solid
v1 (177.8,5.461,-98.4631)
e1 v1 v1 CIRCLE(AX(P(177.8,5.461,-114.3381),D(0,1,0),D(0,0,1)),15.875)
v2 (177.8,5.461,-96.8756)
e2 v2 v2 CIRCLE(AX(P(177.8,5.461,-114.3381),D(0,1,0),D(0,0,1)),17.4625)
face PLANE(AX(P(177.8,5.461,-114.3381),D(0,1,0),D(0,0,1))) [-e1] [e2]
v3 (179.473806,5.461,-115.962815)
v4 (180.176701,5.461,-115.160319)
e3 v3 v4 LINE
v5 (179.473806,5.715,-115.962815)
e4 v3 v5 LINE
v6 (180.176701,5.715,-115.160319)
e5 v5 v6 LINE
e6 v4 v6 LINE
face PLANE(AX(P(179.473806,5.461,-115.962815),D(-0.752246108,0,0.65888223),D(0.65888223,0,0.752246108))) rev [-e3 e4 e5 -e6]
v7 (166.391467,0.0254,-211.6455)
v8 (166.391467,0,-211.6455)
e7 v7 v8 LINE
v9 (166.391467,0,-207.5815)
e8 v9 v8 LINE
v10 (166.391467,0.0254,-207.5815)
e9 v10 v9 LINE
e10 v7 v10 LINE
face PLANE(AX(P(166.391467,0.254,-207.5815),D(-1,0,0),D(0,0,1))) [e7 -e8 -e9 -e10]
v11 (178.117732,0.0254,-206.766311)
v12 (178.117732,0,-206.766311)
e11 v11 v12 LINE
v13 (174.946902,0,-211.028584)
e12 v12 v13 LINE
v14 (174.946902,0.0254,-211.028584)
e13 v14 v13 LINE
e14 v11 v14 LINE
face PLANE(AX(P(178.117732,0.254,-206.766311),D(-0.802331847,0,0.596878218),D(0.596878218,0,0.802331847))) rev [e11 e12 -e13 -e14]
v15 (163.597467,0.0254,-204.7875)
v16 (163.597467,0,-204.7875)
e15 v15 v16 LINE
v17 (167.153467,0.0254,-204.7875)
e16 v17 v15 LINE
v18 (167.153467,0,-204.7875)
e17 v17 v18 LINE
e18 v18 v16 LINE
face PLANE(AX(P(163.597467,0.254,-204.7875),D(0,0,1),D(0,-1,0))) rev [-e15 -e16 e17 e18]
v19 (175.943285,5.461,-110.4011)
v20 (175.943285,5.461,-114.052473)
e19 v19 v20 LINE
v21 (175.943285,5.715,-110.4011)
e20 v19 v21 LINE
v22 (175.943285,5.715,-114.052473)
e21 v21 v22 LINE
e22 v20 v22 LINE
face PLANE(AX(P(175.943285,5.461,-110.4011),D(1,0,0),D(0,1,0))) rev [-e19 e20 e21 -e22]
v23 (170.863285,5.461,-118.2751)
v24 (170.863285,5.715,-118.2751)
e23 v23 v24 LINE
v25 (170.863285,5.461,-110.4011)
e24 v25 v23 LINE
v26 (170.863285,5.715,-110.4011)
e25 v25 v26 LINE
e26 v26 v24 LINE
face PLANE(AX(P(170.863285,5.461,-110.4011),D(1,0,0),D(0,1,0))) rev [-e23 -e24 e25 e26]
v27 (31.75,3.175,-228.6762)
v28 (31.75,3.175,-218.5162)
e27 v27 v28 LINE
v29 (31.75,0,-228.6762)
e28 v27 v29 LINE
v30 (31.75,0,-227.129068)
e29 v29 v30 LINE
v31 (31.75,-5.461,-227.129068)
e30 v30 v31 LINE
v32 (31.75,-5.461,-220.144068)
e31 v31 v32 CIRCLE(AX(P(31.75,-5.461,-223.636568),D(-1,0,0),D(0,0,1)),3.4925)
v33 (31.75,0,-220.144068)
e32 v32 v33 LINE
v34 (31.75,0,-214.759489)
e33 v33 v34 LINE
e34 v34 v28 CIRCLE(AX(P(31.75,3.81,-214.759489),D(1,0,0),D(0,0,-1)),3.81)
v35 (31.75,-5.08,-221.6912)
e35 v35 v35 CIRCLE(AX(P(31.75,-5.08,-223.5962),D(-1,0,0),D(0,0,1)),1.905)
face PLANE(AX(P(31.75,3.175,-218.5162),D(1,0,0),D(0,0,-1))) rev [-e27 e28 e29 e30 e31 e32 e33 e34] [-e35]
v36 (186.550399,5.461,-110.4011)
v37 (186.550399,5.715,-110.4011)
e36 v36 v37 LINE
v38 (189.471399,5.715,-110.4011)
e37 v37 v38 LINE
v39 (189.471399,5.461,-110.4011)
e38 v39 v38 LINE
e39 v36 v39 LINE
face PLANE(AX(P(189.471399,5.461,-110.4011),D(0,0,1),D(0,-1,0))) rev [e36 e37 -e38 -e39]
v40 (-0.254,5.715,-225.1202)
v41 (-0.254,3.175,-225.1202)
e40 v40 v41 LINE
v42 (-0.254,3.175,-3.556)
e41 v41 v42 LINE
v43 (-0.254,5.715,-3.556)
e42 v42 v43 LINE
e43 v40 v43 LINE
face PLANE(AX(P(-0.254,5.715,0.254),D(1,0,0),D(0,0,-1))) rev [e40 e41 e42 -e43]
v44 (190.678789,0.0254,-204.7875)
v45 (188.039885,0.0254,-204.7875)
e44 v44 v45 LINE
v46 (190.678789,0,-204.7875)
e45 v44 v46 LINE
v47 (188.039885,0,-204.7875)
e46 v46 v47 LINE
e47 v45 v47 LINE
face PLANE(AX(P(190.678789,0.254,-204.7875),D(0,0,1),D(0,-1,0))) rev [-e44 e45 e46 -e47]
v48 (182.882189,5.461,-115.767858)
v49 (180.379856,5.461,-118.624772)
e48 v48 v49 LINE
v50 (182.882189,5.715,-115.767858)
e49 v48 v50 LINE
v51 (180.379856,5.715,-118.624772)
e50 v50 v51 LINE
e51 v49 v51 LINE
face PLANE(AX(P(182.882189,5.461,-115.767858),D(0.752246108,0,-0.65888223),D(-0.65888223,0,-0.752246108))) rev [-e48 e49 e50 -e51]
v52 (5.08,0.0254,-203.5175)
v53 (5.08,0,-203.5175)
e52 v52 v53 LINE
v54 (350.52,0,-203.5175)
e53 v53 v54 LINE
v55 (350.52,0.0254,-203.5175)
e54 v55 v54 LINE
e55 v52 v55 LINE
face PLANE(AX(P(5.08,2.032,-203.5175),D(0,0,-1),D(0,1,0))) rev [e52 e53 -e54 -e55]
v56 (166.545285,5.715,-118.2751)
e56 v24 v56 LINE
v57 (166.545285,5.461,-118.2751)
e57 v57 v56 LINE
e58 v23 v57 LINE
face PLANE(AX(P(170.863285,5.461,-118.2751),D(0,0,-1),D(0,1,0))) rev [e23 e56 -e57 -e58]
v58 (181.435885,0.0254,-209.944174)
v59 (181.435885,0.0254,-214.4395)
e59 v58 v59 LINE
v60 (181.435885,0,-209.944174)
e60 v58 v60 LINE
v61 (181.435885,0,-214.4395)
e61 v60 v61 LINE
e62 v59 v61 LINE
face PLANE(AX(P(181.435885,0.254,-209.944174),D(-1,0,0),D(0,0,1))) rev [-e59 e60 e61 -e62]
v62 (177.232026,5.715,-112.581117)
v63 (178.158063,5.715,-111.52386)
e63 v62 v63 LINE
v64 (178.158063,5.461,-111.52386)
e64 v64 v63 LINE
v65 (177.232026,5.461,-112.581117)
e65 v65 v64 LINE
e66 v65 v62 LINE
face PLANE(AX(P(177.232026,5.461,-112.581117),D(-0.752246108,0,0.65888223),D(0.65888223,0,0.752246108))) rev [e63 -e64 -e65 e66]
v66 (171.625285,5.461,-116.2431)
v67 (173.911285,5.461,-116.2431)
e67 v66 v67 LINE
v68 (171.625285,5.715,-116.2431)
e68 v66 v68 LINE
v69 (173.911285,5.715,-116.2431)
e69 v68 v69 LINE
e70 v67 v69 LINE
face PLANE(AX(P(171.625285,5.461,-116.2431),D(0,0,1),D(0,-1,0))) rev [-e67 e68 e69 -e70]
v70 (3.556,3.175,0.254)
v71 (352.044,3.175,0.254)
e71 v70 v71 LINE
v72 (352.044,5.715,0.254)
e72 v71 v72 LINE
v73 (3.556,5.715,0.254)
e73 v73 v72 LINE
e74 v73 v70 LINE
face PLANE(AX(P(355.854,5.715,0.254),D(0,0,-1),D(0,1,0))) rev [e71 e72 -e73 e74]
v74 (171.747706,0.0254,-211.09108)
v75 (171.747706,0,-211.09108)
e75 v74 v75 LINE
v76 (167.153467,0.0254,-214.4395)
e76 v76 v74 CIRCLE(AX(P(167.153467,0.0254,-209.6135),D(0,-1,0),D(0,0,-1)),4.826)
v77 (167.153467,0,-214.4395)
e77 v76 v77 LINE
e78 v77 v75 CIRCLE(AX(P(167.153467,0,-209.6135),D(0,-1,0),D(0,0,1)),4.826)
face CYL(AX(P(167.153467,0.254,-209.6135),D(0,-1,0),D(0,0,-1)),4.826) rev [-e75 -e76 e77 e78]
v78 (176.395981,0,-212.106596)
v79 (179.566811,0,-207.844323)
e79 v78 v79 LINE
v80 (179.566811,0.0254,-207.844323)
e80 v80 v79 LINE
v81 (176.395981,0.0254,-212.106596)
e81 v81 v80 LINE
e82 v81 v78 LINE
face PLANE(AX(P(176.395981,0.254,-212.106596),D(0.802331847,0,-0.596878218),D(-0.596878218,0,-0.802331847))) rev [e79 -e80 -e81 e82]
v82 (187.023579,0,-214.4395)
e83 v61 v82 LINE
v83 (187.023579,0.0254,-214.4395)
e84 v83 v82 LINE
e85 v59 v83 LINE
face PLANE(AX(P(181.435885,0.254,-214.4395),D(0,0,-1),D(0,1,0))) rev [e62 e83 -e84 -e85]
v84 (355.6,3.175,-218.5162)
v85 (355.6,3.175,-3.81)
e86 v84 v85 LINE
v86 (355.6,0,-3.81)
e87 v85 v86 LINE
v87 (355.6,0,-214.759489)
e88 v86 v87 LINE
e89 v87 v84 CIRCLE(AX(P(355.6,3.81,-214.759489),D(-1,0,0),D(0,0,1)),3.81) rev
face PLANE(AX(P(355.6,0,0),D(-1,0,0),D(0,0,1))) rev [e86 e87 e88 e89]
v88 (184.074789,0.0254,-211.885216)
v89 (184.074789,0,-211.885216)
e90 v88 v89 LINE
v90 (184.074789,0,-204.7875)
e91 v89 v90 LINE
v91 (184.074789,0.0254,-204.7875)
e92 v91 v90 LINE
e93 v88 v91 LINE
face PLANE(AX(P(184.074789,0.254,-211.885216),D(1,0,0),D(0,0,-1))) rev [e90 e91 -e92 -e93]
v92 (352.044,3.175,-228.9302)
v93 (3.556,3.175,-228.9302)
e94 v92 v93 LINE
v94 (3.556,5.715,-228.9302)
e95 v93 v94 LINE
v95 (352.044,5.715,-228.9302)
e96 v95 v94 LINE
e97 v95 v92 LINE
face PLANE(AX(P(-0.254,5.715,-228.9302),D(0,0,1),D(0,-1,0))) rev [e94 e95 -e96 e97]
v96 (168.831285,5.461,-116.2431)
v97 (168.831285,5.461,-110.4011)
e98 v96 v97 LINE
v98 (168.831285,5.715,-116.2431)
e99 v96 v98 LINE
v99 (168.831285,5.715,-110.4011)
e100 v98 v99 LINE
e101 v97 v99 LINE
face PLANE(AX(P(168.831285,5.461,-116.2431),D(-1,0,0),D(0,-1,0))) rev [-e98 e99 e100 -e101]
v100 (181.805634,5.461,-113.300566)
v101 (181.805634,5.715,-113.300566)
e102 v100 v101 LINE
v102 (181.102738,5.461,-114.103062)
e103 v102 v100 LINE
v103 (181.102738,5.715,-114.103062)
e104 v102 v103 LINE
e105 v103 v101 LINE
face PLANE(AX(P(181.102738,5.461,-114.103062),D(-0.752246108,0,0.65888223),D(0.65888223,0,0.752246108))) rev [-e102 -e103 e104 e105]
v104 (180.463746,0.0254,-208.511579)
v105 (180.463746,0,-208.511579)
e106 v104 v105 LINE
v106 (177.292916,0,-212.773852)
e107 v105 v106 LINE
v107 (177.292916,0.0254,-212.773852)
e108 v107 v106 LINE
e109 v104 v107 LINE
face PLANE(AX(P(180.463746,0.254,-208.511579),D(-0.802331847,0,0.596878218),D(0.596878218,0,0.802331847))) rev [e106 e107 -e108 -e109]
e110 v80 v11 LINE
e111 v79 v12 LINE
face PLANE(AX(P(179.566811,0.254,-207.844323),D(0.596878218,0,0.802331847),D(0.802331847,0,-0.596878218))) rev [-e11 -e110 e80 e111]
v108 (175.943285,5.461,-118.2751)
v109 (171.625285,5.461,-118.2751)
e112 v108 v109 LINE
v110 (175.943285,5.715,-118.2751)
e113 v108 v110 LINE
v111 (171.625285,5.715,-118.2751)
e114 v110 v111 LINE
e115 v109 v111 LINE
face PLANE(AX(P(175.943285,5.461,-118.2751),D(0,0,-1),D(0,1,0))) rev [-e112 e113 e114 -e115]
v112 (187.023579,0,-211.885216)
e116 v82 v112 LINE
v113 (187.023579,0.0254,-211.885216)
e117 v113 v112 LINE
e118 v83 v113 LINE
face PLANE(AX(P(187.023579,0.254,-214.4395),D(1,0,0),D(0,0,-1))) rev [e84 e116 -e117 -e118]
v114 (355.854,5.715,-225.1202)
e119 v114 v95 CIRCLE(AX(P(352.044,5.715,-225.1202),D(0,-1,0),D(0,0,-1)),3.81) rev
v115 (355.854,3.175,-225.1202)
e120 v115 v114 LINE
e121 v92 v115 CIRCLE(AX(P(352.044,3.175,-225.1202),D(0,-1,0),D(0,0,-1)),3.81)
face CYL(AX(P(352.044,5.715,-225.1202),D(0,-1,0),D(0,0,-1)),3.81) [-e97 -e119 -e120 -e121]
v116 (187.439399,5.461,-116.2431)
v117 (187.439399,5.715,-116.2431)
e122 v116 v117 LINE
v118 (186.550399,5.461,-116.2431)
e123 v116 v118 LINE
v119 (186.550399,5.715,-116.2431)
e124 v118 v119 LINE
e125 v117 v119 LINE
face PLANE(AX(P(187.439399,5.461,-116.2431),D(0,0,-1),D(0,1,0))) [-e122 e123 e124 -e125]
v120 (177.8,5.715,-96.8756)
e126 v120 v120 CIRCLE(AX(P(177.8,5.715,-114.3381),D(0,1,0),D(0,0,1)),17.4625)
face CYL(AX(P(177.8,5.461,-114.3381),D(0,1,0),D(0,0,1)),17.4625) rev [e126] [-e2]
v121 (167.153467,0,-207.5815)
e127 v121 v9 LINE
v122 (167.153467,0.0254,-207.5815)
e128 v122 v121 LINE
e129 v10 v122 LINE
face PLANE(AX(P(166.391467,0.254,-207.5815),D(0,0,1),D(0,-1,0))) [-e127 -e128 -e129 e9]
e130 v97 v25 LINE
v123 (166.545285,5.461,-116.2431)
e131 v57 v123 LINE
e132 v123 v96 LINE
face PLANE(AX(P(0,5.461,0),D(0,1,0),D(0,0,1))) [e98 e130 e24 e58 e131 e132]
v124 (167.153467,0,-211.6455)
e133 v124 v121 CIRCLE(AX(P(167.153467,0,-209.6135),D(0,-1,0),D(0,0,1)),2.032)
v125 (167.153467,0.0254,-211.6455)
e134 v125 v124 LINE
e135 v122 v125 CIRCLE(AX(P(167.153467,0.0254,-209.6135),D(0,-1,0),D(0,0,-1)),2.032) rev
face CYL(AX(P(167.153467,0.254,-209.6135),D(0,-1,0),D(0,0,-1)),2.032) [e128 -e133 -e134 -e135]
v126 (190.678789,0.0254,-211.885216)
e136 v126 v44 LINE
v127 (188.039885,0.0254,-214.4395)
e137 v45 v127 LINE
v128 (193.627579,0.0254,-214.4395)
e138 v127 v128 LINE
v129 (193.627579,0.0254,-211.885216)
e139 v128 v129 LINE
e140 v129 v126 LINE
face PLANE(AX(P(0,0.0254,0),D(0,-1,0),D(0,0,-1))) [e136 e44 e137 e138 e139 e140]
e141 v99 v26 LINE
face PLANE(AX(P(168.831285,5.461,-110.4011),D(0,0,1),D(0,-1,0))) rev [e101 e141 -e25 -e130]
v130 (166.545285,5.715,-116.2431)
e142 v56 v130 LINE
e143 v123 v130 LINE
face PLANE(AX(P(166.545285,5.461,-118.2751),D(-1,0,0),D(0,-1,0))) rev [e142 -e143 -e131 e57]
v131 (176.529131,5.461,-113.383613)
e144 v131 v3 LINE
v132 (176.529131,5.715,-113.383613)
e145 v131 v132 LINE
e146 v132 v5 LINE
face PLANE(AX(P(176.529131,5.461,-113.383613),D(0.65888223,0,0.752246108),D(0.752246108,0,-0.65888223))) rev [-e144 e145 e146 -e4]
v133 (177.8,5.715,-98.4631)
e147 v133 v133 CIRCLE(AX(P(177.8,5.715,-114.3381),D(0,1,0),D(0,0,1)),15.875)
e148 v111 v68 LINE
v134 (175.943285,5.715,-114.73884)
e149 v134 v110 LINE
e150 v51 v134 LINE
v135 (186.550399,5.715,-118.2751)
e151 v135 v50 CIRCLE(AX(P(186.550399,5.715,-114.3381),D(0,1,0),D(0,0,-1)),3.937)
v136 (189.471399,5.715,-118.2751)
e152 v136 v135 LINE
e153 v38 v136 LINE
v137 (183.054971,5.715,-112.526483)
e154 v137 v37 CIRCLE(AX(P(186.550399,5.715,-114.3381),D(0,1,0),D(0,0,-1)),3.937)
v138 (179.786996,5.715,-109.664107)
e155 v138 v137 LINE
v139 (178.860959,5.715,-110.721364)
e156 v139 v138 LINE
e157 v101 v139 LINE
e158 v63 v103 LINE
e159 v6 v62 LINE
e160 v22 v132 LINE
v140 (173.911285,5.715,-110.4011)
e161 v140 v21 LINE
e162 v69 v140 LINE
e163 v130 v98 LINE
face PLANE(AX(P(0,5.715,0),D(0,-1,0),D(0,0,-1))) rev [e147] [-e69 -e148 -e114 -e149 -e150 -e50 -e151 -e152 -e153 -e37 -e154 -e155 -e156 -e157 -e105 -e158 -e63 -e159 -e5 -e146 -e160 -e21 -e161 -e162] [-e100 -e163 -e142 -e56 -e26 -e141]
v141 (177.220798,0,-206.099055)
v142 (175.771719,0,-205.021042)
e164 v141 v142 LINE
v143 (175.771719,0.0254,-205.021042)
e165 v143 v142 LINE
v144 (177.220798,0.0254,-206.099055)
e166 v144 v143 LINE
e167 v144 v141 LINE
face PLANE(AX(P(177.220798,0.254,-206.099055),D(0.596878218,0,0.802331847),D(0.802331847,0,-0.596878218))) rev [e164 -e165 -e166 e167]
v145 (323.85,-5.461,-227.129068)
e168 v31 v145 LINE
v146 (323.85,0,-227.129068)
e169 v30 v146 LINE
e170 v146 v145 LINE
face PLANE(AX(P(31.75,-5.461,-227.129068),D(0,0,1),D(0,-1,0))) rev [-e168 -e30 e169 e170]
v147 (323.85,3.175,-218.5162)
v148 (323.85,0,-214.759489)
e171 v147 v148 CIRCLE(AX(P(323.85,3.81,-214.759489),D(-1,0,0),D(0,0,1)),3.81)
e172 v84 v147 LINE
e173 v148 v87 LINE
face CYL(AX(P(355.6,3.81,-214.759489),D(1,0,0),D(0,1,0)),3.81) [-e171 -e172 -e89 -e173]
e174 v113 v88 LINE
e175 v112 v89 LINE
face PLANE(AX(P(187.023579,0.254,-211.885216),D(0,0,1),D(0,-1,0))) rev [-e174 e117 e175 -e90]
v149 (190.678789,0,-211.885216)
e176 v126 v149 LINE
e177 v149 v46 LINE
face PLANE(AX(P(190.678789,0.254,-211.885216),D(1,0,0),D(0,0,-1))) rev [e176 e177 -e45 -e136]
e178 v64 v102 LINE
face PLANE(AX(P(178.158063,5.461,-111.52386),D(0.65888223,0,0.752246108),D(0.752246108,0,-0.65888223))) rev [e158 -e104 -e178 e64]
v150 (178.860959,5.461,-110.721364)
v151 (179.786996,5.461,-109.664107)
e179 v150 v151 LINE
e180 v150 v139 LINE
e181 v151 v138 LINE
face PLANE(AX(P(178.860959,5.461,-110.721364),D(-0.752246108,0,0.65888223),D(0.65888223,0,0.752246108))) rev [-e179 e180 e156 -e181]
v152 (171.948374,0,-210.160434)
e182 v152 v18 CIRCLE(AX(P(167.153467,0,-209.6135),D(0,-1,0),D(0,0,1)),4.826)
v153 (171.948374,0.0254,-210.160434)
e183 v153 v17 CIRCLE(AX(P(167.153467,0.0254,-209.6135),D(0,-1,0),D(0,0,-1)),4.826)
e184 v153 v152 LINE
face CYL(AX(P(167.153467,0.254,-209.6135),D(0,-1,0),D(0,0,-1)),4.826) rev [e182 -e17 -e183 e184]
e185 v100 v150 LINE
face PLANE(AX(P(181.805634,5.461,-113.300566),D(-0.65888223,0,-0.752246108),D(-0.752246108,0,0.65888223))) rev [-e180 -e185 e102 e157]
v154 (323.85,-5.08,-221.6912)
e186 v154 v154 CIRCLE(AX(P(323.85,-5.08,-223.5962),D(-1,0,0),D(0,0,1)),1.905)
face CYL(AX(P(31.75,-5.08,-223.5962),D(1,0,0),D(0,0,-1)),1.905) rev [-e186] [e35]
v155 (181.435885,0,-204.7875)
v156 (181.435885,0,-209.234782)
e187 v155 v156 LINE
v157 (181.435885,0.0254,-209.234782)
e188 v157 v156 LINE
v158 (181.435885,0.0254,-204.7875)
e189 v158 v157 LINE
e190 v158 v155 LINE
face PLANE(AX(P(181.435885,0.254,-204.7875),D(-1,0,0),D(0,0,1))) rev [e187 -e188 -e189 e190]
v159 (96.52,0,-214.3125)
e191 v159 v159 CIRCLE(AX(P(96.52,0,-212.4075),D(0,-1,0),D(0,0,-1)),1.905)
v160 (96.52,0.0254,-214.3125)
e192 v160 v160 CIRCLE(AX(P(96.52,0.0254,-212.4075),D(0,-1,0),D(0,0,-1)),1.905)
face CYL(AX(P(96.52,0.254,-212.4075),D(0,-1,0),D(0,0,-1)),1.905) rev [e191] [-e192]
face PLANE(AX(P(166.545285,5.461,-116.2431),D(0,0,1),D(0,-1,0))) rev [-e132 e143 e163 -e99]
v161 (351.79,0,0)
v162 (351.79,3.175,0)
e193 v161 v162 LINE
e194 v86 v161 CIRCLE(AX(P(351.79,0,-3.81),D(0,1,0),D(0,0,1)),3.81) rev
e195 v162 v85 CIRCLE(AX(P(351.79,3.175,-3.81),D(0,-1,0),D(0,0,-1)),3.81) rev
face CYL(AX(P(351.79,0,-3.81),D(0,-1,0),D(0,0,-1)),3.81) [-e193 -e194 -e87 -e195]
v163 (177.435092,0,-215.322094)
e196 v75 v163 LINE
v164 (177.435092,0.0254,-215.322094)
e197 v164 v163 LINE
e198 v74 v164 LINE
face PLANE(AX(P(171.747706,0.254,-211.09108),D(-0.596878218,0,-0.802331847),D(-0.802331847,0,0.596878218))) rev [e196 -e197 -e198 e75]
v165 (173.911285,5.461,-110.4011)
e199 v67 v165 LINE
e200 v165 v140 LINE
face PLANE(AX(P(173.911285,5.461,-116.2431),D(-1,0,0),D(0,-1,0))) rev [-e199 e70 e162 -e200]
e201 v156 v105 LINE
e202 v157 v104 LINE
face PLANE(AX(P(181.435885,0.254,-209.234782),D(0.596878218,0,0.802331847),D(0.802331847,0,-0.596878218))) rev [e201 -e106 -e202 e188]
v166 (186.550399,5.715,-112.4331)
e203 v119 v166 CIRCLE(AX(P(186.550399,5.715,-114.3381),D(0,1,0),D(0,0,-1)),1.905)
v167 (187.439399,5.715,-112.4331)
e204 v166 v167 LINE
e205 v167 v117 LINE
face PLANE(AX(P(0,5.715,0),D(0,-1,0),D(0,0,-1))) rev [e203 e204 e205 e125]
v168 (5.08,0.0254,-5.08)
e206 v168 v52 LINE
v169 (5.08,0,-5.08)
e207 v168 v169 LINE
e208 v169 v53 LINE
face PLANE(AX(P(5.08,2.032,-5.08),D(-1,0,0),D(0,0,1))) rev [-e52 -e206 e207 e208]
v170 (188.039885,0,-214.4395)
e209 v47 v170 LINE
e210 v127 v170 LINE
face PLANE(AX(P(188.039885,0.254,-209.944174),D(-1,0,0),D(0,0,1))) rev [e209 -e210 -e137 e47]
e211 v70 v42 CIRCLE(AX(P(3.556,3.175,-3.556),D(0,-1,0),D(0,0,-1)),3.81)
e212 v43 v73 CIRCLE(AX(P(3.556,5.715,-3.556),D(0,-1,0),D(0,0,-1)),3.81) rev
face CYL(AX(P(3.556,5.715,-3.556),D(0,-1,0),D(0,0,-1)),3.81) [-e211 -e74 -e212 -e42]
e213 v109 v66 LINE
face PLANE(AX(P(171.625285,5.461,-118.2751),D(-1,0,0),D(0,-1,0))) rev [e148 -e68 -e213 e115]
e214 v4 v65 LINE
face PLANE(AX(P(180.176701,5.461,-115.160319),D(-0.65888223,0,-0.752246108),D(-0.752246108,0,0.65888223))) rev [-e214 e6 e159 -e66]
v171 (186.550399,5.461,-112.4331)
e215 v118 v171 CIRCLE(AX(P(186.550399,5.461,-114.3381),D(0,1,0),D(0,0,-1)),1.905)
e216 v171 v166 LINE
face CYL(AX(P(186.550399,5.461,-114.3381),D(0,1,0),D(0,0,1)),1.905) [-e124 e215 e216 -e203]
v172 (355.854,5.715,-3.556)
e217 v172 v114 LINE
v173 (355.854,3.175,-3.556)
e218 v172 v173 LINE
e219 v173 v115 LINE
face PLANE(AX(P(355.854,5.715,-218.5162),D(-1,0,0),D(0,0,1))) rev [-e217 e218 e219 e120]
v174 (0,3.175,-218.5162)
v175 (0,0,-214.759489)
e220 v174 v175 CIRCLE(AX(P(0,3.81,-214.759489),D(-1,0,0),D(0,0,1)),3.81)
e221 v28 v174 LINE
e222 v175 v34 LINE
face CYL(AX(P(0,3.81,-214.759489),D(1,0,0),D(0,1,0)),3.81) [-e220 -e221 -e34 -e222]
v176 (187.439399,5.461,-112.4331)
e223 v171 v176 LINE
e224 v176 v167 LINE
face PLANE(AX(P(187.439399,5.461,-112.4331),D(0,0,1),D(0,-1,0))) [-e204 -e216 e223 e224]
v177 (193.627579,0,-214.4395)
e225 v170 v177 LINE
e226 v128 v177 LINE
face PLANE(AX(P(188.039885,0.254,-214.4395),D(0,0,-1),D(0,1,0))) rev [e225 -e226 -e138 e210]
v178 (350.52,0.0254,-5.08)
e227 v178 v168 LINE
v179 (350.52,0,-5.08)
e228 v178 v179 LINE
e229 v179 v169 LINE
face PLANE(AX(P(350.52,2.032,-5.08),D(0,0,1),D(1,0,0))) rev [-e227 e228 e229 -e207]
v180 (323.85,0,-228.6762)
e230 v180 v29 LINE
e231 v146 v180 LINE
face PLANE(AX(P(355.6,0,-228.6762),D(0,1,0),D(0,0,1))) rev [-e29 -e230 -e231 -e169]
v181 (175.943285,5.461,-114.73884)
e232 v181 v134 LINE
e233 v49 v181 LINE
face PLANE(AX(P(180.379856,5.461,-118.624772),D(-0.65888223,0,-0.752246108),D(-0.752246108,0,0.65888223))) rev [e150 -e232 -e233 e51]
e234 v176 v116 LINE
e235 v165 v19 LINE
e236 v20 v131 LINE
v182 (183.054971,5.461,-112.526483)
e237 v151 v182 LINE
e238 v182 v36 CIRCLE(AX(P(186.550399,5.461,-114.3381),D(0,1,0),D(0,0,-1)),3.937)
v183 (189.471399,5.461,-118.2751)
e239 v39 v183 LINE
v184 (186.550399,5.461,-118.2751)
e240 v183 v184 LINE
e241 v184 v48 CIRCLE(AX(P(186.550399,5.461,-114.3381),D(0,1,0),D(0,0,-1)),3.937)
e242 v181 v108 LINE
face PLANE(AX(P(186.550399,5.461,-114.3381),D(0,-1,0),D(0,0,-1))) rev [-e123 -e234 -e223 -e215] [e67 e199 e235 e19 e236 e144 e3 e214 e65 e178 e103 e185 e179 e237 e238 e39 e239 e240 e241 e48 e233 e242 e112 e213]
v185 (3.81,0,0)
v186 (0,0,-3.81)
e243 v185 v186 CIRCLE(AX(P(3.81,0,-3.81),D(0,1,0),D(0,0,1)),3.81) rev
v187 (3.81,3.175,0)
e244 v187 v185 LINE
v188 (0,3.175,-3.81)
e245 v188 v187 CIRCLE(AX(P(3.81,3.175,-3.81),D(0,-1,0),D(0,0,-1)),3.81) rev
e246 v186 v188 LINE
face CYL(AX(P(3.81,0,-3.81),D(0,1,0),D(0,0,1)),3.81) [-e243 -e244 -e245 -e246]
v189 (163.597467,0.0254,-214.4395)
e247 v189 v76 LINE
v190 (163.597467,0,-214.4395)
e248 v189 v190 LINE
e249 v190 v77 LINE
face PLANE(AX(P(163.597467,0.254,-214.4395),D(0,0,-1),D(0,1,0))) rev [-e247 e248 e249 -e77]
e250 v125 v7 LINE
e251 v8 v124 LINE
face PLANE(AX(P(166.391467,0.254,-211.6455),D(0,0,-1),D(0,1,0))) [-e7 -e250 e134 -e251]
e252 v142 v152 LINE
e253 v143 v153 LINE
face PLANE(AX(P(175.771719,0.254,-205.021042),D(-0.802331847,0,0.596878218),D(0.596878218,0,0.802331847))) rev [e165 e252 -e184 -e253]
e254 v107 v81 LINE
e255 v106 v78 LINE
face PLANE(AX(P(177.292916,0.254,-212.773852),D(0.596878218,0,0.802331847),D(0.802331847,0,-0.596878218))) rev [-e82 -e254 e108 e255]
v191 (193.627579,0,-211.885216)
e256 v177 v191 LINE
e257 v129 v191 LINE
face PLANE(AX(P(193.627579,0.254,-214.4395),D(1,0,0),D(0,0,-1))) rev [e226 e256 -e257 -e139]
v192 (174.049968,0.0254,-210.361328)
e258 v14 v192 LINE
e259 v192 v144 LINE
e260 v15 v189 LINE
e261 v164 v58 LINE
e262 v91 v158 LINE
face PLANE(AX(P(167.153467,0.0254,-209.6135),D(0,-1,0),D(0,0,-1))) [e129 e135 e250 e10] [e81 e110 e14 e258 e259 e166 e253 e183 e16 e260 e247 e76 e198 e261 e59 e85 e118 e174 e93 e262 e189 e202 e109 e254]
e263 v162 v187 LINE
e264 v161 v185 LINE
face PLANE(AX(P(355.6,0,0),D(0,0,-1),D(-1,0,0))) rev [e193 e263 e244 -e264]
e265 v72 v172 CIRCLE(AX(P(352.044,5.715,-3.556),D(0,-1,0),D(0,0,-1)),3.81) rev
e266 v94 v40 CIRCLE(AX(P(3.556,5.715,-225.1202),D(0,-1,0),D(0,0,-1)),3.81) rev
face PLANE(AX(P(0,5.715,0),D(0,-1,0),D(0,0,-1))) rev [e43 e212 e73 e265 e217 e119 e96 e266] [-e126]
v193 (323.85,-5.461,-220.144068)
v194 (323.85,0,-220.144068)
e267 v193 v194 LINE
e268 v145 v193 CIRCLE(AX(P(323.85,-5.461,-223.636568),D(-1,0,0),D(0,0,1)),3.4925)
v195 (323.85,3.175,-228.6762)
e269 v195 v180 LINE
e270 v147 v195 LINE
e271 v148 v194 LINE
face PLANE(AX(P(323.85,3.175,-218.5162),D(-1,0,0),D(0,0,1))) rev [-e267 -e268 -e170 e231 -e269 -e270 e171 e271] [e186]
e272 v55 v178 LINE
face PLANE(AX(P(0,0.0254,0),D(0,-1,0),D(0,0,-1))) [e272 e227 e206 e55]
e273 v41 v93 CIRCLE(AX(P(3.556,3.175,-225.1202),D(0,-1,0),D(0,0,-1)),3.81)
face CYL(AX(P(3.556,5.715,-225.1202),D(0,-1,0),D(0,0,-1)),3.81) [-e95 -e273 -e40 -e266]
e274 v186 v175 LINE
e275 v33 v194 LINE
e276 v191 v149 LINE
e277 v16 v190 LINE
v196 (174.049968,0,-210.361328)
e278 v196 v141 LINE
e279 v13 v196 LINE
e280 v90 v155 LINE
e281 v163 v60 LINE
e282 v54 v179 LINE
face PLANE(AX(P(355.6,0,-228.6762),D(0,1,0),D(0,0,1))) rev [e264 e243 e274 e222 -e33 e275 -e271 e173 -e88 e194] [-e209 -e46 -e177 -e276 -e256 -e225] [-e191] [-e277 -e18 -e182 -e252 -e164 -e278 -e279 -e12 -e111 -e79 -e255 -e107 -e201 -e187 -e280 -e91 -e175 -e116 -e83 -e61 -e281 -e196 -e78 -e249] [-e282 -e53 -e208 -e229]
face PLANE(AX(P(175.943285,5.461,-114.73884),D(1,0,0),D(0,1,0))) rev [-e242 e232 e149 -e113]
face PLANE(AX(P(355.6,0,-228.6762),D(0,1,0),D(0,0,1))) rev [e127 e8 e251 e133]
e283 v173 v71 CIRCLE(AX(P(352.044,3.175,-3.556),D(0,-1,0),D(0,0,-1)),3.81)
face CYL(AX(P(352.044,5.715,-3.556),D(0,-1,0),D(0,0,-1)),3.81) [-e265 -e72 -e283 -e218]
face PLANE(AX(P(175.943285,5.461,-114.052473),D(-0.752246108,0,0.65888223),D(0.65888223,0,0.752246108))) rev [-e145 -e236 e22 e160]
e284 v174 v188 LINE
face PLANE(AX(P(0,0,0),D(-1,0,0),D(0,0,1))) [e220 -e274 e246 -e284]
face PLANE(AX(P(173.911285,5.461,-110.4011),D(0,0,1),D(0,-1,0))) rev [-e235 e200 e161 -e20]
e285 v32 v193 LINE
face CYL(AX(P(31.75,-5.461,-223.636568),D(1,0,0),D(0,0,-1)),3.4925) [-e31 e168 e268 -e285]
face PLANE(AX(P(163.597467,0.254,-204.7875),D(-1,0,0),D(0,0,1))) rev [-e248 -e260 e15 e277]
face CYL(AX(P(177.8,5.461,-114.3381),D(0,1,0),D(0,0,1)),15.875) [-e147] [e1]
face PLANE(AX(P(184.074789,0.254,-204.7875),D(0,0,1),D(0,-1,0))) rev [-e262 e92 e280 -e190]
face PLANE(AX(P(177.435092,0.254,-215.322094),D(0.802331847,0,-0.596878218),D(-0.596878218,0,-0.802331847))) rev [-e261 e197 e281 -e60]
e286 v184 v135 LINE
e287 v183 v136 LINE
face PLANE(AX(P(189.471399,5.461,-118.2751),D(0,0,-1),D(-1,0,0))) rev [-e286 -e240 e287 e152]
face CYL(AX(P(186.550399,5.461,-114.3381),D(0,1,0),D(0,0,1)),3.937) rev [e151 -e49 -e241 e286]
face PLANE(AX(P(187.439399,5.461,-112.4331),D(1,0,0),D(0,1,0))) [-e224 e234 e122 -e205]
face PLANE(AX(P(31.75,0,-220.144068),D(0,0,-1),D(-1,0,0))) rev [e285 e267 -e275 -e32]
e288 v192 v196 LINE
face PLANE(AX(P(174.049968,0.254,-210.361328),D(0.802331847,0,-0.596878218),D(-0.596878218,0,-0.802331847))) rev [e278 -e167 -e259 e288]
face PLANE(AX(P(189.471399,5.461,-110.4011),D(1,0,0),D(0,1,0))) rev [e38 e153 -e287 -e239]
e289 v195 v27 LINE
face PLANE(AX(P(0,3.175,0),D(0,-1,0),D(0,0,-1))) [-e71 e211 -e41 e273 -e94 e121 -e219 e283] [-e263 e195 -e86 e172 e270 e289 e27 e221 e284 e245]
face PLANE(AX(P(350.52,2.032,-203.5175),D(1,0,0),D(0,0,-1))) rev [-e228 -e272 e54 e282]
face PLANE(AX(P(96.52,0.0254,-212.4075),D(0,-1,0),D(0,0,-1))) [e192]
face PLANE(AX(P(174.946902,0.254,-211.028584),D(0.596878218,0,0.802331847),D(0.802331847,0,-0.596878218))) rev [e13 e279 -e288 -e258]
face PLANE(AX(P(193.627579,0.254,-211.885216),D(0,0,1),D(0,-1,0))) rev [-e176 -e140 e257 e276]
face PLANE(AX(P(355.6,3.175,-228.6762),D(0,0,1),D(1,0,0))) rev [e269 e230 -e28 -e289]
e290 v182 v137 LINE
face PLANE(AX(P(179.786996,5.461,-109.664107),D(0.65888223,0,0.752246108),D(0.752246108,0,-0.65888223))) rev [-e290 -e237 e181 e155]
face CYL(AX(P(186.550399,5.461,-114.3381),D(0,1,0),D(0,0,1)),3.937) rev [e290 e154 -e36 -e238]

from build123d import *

# Parameters (mm, degrees)
SKETCH1_W           = 228.6762
SKETCH1_H           = 3.175
BOSS_EXTRUDE1_DEPTH = 355.6
SKETCH2_W           = 31.75
SKETCH2_H           = 10.16
CUT_EXTRUDE1_DEPTH  = 423.793383429
SKETCH3_W           = 345.44
SKETCH3_H           = 198.4375
CUT_EXTRUDE2_DEPTH  = 2.032
SKETCH4_W           = 345.44
SKETCH4_H           = 198.4375
BOSS_EXTRUDE2_DEPTH = 2.0066
BOSS_EXTRUDE3_DEPTH = 2.54
FILLET1_R           = 3.81
SKETCH7_R           = 17.4625
SKETCH7_R_2         = 15.875
CUT_EXTRUDE3_DEPTH  = 0.254
CUT_EXTRUDE4_DEPTH  = 0.254
SKETCH9_R           = 1.905
CUT_EXTRUDE5_DEPTH  = 0.254
BOSS_EXTRUDE4_START = 0.2286
SKETCH10_R          = 1.905
BOSS_EXTRUDE4_DEPTH = 0.2286
BOSS_EXTRUDE5_START = 0.2286
BOSS_EXTRUDE5_DEPTH = 0.2286
SKETCH13_R          = 1.905
BOSS_EXTRUDE6_DEPTH = 146.05
FILLET2_R           = 3.81


with BuildPart() as part:
    # Sketch1 → Boss-Extrude1 (new body)
    with BuildSketch(Plane(origin=(0, 0, 0), x_dir=(0, 0, -1), z_dir=(1, 0, 0))):
        with Locations((114.3381, 1.5875)):
            Rectangle(SKETCH1_W, SKETCH1_H)
    extrude(amount=BOSS_EXTRUDE1_DEPTH)

    # Sketch2 → Cut-Extrude1 (cut, through all)
    with BuildSketch(Plane(origin=(0, 0, 0), x_dir=(-1, 0, 0), z_dir=(0, -1, 0))):
        with Locations((-15.875, 223.5962)):
            Rectangle(SKETCH2_W, SKETCH2_H)
        with Locations((-339.725, 223.5962)):
            Rectangle(SKETCH2_W, SKETCH2_H)
    extrude(amount=-CUT_EXTRUDE1_DEPTH, mode=Mode.SUBTRACT)

    # Sketch3 → Cut-Extrude2 (cut)
    with BuildSketch(Plane.XZ):
        with Locations((177.8, -104.29875)):
            Rectangle(SKETCH3_W, SKETCH3_H)
    extrude(amount=-CUT_EXTRUDE2_DEPTH, mode=Mode.SUBTRACT)

    # Sketch4 → Boss-Extrude2 (add)
    with BuildSketch(Plane.XZ.offset(-2.032)):
        with Locations((177.8, -104.29875)):
            Rectangle(SKETCH4_W, SKETCH4_H)
    extrude(amount=BOSS_EXTRUDE2_DEPTH)

    # Sketch6 → Boss-Extrude3 (add)
    with BuildSketch(Plane(origin=(0, 3.175, 0), x_dir=(1, 0, 0), z_dir=(0, 1, 0))):
        Polygon((-0.254, 218.5162), (-0.254, 228.9302), (355.854, 228.9302), (355.854, 218.5162), (355.854, -0.254), (-0.254, -0.254), align=None)
    extrude(amount=BOSS_EXTRUDE3_DEPTH)

    # Fillet1
    fillet1_edges = [part.edges().sort_by_distance(p)[0] for p in [
        (355.6, 1.5875, 0),
        (0, 1.5875, 0),
        (355.854, 4.445, -228.9302),
        (-0.254, 4.445, -228.9302),
        (-0.254, 4.445, 0.254),
        (355.854, 4.445, 0.254),
    ]]
    fillet(fillet1_edges, radius=FILLET1_R)

    # Sketch7 → Cut-Extrude3 (cut)
    with BuildSketch(Plane(origin=(0, 5.715, 0), x_dir=(1, 0, 0), z_dir=(0, 1, 0))):
        with Locations(Location((177.8, 114.3381, 0), (0, 0, 270))):
            Circle(SKETCH7_R)
        with Locations(Location((177.8, 114.3381, 0), (0, 0, 270))):
            Circle(SKETCH7_R_2, mode=Mode.SUBTRACT)
    extrude(amount=-CUT_EXTRUDE3_DEPTH, mode=Mode.SUBTRACT)

    # Sketch8 → Cut-Extrude4 (cut)
    # profile 1 of 2: a face of its own
    with BuildSketch(Plane(origin=(0, 5.715, 0), x_dir=(1, 0, 0), z_dir=(0, 1, 0))):
        with BuildLine():
            Line((189.471398708, 110.4011), (186.550398708, 110.4011))
            ThreePointArc((186.550398708, 110.4011), (184.504960684, 110.974151087), (183.054971216, 112.52648314))
            Line((183.054971216, 112.52648314), (179.786995785, 109.664107496))
            Line((179.786995785, 109.664107496), (178.860958774, 110.721364327))
            Line((178.860958774, 110.721364327), (181.805633989, 113.300565668))
            Line((181.805633989, 113.300565668), (181.102738426, 114.103061816))
            Line((181.102738426, 114.103061816), (178.158063211, 111.523860475))
            Line((178.158063211, 111.523860475), (177.2320262, 112.581117305))
            Line((177.2320262, 112.581117305), (180.176701415, 115.160318646))
            Line((180.176701415, 115.160318646), (179.473805853, 115.962814795))
            Line((179.473805853, 115.962814795), (176.529130638, 113.383613454))
            Line((176.529130638, 113.383613454), (175.943285209, 114.052473416))
            Line((175.943285209, 114.052473416), (175.943285209, 110.4011))
            Line((175.943285209, 110.4011), (173.911285209, 110.4011))
            Line((173.911285209, 110.4011), (173.911285209, 116.2431))
            Line((173.911285209, 116.2431), (171.625285209, 116.2431))
            Line((171.625285209, 116.2431), (171.625285209, 118.2751))
            Line((171.625285209, 118.2751), (175.943285209, 118.2751))
            Line((175.943285209, 118.2751), (175.943285209, 114.738839507))
            Line((175.943285209, 114.738839507), (180.379856415, 118.624772442))
            Line((180.379856415, 118.624772442), (182.882189217, 115.767858068))
            ThreePointArc((182.882189217, 115.767858068), (184.328798892, 117.588402025), (186.550398708, 118.2751))
            Line((186.550398708, 118.2751), (189.471398708, 118.2751))
            Line((189.471398708, 118.2751), (189.471398708, 110.4011))
        make_face()
        with BuildLine():
            Line((187.439398708, 112.4331), (187.439398708, 116.2431))
            Line((187.439398708, 116.2431), (186.550398708, 116.2431))
            ThreePointArc((186.550398708, 116.2431), (184.645398708, 114.3381), (186.550398708, 112.4331))
            Line((186.550398708, 112.4331), (187.439398708, 112.4331))
        make_face(mode=Mode.SUBTRACT)
    # profile 2 of 2: a face of its own
    with BuildSketch(Plane(origin=(0, 5.715, 0), x_dir=(1, 0, 0), z_dir=(0, 1, 0))):
        Polygon((168.831285209, 116.2431), (168.831285209, 110.4011), (170.863285209, 110.4011), (170.863285209, 118.2751), (166.545285209, 118.2751), (166.545285209, 116.2431), align=None)
    extrude(amount=-CUT_EXTRUDE4_DEPTH, mode=Mode.SUBTRACT)

    # Sketch9 → Cut-Extrude5 (cut)
    # profile 1 of 3: a face of its own
    with BuildSketch(Plane.XZ):
        with Locations(Location((96.52, -212.4075, 0), (0, 0, 270))):
            Circle(SKETCH9_R)
    # profile 2 of 3: a face of its own
    with BuildSketch(Plane.XZ):
        with BuildLine():
            Line((163.597466716, -204.7875), (163.597466716, -214.4395))
            Line((163.597466716, -214.4395), (167.153466716, -214.4395))
            ThreePointArc((167.153466716, -214.4395), (169.995954467, -213.513569152), (171.747705751, -211.091080351))
            Line((171.747705751, -211.091080351), (177.435092391, -215.322094253))
            Line((177.435092391, -215.322094253), (181.43588491, -209.94417434))
            Line((181.43588491, -209.94417434), (181.43588491, -214.4395))
            Line((181.43588491, -214.4395), (187.023578862, -214.4395))
            Line((187.023578862, -214.4395), (187.023578862, -211.885215882))
            Line((187.023578862, -211.885215882), (184.074788764, -211.885215882))
            Line((184.074788764, -211.885215882), (184.074788764, -204.7875))
            Line((184.074788764, -204.7875), (181.43588491, -204.7875))
            Line((181.43588491, -204.7875), (181.43588491, -209.234781788))
            Line((181.43588491, -209.234781788), (180.463746146, -208.51157922))
            Line((180.463746146, -208.51157922), (177.292916042, -212.773852326))
            Line((177.292916042, -212.773852326), (176.395981379, -212.106596296))
            Line((176.395981379, -212.106596296), (179.566811483, -207.84432319))
            Line((179.566811483, -207.84432319), (178.117732485, -206.766310779))
            Line((178.117732485, -206.766310779), (174.946902382, -211.028583886))
            Line((174.946902382, -211.028583886), (174.049967719, -210.361327856))
            Line((174.049967719, -210.361327856), (177.220797822, -206.099054749))
            Line((177.220797822, -206.099054749), (175.771718825, -205.021042339))
            Line((175.771718825, -205.021042339), (171.948374325, -210.160434204))
            ThreePointArc((171.948374325, -210.160434204), (170.754145851, -206.400186171), (167.153466716, -204.7875))
            Line((167.153466716, -204.7875), (163.597466716, -204.7875))
        make_face()
        with BuildLine():
            Line((166.391466716, -211.6455), (167.153466716, -211.6455))
            ThreePointArc((167.153466716, -211.6455), (169.185466716, -209.6135), (167.153466716, -207.5815))
            Line((167.153466716, -207.5815), (166.391466716, -207.5815))
            Line((166.391466716, -207.5815), (166.391466716, -211.6455))
        make_face(mode=Mode.SUBTRACT)
    # profile 3 of 3: a face of its own
    with BuildSketch(Plane.XZ):
        Polygon((190.678788764, -204.7875), (188.03988491, -204.7875), (188.03988491, -209.234781788), (188.03988491, -209.94417434), (188.03988491, -214.4395), (193.627578862, -214.4395), (193.627578862, -211.885215882), (190.678788764, -211.885215882), align=None)
    extrude(amount=-CUT_EXTRUDE5_DEPTH, mode=Mode.SUBTRACT)

    # Sketch10 → Boss-Extrude4 (add)
    with BuildSketch(Plane.XZ.offset(-0.254).offset(BOSS_EXTRUDE4_START)):
        with Locations(Location((96.52, -212.4075, 0), (0, 0, 270))):
            Circle(SKETCH10_R)
    extrude(amount=-BOSS_EXTRUDE4_DEPTH)

    # Sketch12 → Boss-Extrude5 (add)
    with BuildSketch(Plane.XZ.offset(-0.254).offset(BOSS_EXTRUDE5_START)):
        Polygon((188.03988491, -204.7875), (188.03988491, -214.4395), (193.627578862, -214.4395), (193.627578862, -211.885215882), (190.678788764, -211.885215882), (190.678788764, -204.7875), align=None)
        with BuildLine():
            Line((167.153466716, -204.7875), (163.597466716, -204.7875))
            Line((163.597466716, -204.7875), (163.597466716, -214.4395))
            Line((163.597466716, -214.4395), (167.153466716, -214.4395))
            ThreePointArc((167.153466716, -214.4395), (169.995954467, -213.513569152), (171.747705751, -211.091080351))
            Line((171.747705751, -211.091080351), (177.435092391, -215.322094253))
            Line((177.435092391, -215.322094253), (181.43588491, -209.94417434))
            Line((181.43588491, -209.94417434), (181.43588491, -214.4395))
            Line((181.43588491, -214.4395), (187.023578862, -214.4395))
            Line((187.023578862, -214.4395), (187.023578862, -211.885215882))
            Line((187.023578862, -211.885215882), (184.074788764, -211.885215882))
            Line((184.074788764, -211.885215882), (184.074788764, -204.7875))
            Line((184.074788764, -204.7875), (181.43588491, -204.7875))
            Line((181.43588491, -204.7875), (181.43588491, -209.234781788))
            Line((181.43588491, -209.234781788), (180.463746146, -208.51157922))
            Line((180.463746146, -208.51157922), (177.292916042, -212.773852326))
            Line((177.292916042, -212.773852326), (176.395981379, -212.106596296))
            Line((176.395981379, -212.106596296), (179.566811483, -207.84432319))
            Line((179.566811483, -207.84432319), (178.117732485, -206.766310779))
            Line((178.117732485, -206.766310779), (174.946902382, -211.028583886))
            Line((174.946902382, -211.028583886), (174.049967719, -210.361327856))
            Line((174.049967719, -210.361327856), (177.220797822, -206.099054749))
            Line((177.220797822, -206.099054749), (175.771718825, -205.021042339))
            Line((175.771718825, -205.021042339), (171.948374325, -210.160434204))
            ThreePointArc((171.948374325, -210.160434204), (170.754145851, -206.400186171), (167.153466716, -204.7875))
        make_face()
    extrude(amount=-BOSS_EXTRUDE5_DEPTH)

    # Sketch13 → Boss-Extrude6 (add, symmetric)
    with BuildSketch(Plane.ZY.offset(-177.8)):
        with BuildLine():
            Line((-227.129067699, -5.461), (-227.129067699, 0))
            Line((-227.129067699, 0), (-220.144067699, 0))
            Line((-220.144067699, 0), (-220.144067699, -5.461))
            ThreePointArc((-220.144067699, -5.461), (-223.636567699, -8.9535), (-227.129067699, -5.461))
        make_face()
        with Locations((-223.5962, -5.08)):
            Circle(SKETCH13_R, mode=Mode.SUBTRACT)
    extrude(amount=BOSS_EXTRUDE6_DEPTH, both=True)

    # Fillet2
    # the kernel refuses this fillet: 3.81 mm, written as the material it takes off along each edge
    with BuildSketch(Plane(origin=(364.991776656, 0, -218.5162), x_dir=(0, 1, 0), z_dir=(-1, 0, 0))) as fillet2_piece_1:
        with BuildLine():
            CenterArc((3.81, -3.756710662), FILLET2_R, 99.594068227, 80.405931773)
            Line((0, -3.756710662), (-0.0762, -3.756710662))
            Line((-0.0762, -3.756710662), (-0.0762, 0))
            Line((-0.0762, 0), (0, 0.0762))
            ThreePointArc((0, 0.0762), (1.5875, 0.0762), (3.1623, 0.075134213))
            Line((3.1623, 0.075134213), (3.175, 0))
        make_face()
    extrude(amount=41.141776656, mode=Mode.SUBTRACT)
    with BuildSketch(Plane(origin=(-9.391776656, 0, -218.5162), x_dir=(0, 1, 0), z_dir=(1, 0, 0))) as fillet2_piece_2:
        with BuildLine():
            CenterArc((3.81, 3.756710662), FILLET2_R, 180, 80.405931773)
            Line((0, 3.756710662), (-0.0762, 3.756710662))
            Line((-0.0762, 3.756710662), (-0.0762, 0))
            Line((-0.0762, 0), (0, -0.0762))
            ThreePointArc((0, -0.0762), (1.5875, -0.0762), (3.1623, -0.075134213))
            Line((3.1623, -0.075134213), (3.175, 0))
        make_face()
    extrude(amount=41.141776656, mode=Mode.SUBTRACT)


solid = part.part
